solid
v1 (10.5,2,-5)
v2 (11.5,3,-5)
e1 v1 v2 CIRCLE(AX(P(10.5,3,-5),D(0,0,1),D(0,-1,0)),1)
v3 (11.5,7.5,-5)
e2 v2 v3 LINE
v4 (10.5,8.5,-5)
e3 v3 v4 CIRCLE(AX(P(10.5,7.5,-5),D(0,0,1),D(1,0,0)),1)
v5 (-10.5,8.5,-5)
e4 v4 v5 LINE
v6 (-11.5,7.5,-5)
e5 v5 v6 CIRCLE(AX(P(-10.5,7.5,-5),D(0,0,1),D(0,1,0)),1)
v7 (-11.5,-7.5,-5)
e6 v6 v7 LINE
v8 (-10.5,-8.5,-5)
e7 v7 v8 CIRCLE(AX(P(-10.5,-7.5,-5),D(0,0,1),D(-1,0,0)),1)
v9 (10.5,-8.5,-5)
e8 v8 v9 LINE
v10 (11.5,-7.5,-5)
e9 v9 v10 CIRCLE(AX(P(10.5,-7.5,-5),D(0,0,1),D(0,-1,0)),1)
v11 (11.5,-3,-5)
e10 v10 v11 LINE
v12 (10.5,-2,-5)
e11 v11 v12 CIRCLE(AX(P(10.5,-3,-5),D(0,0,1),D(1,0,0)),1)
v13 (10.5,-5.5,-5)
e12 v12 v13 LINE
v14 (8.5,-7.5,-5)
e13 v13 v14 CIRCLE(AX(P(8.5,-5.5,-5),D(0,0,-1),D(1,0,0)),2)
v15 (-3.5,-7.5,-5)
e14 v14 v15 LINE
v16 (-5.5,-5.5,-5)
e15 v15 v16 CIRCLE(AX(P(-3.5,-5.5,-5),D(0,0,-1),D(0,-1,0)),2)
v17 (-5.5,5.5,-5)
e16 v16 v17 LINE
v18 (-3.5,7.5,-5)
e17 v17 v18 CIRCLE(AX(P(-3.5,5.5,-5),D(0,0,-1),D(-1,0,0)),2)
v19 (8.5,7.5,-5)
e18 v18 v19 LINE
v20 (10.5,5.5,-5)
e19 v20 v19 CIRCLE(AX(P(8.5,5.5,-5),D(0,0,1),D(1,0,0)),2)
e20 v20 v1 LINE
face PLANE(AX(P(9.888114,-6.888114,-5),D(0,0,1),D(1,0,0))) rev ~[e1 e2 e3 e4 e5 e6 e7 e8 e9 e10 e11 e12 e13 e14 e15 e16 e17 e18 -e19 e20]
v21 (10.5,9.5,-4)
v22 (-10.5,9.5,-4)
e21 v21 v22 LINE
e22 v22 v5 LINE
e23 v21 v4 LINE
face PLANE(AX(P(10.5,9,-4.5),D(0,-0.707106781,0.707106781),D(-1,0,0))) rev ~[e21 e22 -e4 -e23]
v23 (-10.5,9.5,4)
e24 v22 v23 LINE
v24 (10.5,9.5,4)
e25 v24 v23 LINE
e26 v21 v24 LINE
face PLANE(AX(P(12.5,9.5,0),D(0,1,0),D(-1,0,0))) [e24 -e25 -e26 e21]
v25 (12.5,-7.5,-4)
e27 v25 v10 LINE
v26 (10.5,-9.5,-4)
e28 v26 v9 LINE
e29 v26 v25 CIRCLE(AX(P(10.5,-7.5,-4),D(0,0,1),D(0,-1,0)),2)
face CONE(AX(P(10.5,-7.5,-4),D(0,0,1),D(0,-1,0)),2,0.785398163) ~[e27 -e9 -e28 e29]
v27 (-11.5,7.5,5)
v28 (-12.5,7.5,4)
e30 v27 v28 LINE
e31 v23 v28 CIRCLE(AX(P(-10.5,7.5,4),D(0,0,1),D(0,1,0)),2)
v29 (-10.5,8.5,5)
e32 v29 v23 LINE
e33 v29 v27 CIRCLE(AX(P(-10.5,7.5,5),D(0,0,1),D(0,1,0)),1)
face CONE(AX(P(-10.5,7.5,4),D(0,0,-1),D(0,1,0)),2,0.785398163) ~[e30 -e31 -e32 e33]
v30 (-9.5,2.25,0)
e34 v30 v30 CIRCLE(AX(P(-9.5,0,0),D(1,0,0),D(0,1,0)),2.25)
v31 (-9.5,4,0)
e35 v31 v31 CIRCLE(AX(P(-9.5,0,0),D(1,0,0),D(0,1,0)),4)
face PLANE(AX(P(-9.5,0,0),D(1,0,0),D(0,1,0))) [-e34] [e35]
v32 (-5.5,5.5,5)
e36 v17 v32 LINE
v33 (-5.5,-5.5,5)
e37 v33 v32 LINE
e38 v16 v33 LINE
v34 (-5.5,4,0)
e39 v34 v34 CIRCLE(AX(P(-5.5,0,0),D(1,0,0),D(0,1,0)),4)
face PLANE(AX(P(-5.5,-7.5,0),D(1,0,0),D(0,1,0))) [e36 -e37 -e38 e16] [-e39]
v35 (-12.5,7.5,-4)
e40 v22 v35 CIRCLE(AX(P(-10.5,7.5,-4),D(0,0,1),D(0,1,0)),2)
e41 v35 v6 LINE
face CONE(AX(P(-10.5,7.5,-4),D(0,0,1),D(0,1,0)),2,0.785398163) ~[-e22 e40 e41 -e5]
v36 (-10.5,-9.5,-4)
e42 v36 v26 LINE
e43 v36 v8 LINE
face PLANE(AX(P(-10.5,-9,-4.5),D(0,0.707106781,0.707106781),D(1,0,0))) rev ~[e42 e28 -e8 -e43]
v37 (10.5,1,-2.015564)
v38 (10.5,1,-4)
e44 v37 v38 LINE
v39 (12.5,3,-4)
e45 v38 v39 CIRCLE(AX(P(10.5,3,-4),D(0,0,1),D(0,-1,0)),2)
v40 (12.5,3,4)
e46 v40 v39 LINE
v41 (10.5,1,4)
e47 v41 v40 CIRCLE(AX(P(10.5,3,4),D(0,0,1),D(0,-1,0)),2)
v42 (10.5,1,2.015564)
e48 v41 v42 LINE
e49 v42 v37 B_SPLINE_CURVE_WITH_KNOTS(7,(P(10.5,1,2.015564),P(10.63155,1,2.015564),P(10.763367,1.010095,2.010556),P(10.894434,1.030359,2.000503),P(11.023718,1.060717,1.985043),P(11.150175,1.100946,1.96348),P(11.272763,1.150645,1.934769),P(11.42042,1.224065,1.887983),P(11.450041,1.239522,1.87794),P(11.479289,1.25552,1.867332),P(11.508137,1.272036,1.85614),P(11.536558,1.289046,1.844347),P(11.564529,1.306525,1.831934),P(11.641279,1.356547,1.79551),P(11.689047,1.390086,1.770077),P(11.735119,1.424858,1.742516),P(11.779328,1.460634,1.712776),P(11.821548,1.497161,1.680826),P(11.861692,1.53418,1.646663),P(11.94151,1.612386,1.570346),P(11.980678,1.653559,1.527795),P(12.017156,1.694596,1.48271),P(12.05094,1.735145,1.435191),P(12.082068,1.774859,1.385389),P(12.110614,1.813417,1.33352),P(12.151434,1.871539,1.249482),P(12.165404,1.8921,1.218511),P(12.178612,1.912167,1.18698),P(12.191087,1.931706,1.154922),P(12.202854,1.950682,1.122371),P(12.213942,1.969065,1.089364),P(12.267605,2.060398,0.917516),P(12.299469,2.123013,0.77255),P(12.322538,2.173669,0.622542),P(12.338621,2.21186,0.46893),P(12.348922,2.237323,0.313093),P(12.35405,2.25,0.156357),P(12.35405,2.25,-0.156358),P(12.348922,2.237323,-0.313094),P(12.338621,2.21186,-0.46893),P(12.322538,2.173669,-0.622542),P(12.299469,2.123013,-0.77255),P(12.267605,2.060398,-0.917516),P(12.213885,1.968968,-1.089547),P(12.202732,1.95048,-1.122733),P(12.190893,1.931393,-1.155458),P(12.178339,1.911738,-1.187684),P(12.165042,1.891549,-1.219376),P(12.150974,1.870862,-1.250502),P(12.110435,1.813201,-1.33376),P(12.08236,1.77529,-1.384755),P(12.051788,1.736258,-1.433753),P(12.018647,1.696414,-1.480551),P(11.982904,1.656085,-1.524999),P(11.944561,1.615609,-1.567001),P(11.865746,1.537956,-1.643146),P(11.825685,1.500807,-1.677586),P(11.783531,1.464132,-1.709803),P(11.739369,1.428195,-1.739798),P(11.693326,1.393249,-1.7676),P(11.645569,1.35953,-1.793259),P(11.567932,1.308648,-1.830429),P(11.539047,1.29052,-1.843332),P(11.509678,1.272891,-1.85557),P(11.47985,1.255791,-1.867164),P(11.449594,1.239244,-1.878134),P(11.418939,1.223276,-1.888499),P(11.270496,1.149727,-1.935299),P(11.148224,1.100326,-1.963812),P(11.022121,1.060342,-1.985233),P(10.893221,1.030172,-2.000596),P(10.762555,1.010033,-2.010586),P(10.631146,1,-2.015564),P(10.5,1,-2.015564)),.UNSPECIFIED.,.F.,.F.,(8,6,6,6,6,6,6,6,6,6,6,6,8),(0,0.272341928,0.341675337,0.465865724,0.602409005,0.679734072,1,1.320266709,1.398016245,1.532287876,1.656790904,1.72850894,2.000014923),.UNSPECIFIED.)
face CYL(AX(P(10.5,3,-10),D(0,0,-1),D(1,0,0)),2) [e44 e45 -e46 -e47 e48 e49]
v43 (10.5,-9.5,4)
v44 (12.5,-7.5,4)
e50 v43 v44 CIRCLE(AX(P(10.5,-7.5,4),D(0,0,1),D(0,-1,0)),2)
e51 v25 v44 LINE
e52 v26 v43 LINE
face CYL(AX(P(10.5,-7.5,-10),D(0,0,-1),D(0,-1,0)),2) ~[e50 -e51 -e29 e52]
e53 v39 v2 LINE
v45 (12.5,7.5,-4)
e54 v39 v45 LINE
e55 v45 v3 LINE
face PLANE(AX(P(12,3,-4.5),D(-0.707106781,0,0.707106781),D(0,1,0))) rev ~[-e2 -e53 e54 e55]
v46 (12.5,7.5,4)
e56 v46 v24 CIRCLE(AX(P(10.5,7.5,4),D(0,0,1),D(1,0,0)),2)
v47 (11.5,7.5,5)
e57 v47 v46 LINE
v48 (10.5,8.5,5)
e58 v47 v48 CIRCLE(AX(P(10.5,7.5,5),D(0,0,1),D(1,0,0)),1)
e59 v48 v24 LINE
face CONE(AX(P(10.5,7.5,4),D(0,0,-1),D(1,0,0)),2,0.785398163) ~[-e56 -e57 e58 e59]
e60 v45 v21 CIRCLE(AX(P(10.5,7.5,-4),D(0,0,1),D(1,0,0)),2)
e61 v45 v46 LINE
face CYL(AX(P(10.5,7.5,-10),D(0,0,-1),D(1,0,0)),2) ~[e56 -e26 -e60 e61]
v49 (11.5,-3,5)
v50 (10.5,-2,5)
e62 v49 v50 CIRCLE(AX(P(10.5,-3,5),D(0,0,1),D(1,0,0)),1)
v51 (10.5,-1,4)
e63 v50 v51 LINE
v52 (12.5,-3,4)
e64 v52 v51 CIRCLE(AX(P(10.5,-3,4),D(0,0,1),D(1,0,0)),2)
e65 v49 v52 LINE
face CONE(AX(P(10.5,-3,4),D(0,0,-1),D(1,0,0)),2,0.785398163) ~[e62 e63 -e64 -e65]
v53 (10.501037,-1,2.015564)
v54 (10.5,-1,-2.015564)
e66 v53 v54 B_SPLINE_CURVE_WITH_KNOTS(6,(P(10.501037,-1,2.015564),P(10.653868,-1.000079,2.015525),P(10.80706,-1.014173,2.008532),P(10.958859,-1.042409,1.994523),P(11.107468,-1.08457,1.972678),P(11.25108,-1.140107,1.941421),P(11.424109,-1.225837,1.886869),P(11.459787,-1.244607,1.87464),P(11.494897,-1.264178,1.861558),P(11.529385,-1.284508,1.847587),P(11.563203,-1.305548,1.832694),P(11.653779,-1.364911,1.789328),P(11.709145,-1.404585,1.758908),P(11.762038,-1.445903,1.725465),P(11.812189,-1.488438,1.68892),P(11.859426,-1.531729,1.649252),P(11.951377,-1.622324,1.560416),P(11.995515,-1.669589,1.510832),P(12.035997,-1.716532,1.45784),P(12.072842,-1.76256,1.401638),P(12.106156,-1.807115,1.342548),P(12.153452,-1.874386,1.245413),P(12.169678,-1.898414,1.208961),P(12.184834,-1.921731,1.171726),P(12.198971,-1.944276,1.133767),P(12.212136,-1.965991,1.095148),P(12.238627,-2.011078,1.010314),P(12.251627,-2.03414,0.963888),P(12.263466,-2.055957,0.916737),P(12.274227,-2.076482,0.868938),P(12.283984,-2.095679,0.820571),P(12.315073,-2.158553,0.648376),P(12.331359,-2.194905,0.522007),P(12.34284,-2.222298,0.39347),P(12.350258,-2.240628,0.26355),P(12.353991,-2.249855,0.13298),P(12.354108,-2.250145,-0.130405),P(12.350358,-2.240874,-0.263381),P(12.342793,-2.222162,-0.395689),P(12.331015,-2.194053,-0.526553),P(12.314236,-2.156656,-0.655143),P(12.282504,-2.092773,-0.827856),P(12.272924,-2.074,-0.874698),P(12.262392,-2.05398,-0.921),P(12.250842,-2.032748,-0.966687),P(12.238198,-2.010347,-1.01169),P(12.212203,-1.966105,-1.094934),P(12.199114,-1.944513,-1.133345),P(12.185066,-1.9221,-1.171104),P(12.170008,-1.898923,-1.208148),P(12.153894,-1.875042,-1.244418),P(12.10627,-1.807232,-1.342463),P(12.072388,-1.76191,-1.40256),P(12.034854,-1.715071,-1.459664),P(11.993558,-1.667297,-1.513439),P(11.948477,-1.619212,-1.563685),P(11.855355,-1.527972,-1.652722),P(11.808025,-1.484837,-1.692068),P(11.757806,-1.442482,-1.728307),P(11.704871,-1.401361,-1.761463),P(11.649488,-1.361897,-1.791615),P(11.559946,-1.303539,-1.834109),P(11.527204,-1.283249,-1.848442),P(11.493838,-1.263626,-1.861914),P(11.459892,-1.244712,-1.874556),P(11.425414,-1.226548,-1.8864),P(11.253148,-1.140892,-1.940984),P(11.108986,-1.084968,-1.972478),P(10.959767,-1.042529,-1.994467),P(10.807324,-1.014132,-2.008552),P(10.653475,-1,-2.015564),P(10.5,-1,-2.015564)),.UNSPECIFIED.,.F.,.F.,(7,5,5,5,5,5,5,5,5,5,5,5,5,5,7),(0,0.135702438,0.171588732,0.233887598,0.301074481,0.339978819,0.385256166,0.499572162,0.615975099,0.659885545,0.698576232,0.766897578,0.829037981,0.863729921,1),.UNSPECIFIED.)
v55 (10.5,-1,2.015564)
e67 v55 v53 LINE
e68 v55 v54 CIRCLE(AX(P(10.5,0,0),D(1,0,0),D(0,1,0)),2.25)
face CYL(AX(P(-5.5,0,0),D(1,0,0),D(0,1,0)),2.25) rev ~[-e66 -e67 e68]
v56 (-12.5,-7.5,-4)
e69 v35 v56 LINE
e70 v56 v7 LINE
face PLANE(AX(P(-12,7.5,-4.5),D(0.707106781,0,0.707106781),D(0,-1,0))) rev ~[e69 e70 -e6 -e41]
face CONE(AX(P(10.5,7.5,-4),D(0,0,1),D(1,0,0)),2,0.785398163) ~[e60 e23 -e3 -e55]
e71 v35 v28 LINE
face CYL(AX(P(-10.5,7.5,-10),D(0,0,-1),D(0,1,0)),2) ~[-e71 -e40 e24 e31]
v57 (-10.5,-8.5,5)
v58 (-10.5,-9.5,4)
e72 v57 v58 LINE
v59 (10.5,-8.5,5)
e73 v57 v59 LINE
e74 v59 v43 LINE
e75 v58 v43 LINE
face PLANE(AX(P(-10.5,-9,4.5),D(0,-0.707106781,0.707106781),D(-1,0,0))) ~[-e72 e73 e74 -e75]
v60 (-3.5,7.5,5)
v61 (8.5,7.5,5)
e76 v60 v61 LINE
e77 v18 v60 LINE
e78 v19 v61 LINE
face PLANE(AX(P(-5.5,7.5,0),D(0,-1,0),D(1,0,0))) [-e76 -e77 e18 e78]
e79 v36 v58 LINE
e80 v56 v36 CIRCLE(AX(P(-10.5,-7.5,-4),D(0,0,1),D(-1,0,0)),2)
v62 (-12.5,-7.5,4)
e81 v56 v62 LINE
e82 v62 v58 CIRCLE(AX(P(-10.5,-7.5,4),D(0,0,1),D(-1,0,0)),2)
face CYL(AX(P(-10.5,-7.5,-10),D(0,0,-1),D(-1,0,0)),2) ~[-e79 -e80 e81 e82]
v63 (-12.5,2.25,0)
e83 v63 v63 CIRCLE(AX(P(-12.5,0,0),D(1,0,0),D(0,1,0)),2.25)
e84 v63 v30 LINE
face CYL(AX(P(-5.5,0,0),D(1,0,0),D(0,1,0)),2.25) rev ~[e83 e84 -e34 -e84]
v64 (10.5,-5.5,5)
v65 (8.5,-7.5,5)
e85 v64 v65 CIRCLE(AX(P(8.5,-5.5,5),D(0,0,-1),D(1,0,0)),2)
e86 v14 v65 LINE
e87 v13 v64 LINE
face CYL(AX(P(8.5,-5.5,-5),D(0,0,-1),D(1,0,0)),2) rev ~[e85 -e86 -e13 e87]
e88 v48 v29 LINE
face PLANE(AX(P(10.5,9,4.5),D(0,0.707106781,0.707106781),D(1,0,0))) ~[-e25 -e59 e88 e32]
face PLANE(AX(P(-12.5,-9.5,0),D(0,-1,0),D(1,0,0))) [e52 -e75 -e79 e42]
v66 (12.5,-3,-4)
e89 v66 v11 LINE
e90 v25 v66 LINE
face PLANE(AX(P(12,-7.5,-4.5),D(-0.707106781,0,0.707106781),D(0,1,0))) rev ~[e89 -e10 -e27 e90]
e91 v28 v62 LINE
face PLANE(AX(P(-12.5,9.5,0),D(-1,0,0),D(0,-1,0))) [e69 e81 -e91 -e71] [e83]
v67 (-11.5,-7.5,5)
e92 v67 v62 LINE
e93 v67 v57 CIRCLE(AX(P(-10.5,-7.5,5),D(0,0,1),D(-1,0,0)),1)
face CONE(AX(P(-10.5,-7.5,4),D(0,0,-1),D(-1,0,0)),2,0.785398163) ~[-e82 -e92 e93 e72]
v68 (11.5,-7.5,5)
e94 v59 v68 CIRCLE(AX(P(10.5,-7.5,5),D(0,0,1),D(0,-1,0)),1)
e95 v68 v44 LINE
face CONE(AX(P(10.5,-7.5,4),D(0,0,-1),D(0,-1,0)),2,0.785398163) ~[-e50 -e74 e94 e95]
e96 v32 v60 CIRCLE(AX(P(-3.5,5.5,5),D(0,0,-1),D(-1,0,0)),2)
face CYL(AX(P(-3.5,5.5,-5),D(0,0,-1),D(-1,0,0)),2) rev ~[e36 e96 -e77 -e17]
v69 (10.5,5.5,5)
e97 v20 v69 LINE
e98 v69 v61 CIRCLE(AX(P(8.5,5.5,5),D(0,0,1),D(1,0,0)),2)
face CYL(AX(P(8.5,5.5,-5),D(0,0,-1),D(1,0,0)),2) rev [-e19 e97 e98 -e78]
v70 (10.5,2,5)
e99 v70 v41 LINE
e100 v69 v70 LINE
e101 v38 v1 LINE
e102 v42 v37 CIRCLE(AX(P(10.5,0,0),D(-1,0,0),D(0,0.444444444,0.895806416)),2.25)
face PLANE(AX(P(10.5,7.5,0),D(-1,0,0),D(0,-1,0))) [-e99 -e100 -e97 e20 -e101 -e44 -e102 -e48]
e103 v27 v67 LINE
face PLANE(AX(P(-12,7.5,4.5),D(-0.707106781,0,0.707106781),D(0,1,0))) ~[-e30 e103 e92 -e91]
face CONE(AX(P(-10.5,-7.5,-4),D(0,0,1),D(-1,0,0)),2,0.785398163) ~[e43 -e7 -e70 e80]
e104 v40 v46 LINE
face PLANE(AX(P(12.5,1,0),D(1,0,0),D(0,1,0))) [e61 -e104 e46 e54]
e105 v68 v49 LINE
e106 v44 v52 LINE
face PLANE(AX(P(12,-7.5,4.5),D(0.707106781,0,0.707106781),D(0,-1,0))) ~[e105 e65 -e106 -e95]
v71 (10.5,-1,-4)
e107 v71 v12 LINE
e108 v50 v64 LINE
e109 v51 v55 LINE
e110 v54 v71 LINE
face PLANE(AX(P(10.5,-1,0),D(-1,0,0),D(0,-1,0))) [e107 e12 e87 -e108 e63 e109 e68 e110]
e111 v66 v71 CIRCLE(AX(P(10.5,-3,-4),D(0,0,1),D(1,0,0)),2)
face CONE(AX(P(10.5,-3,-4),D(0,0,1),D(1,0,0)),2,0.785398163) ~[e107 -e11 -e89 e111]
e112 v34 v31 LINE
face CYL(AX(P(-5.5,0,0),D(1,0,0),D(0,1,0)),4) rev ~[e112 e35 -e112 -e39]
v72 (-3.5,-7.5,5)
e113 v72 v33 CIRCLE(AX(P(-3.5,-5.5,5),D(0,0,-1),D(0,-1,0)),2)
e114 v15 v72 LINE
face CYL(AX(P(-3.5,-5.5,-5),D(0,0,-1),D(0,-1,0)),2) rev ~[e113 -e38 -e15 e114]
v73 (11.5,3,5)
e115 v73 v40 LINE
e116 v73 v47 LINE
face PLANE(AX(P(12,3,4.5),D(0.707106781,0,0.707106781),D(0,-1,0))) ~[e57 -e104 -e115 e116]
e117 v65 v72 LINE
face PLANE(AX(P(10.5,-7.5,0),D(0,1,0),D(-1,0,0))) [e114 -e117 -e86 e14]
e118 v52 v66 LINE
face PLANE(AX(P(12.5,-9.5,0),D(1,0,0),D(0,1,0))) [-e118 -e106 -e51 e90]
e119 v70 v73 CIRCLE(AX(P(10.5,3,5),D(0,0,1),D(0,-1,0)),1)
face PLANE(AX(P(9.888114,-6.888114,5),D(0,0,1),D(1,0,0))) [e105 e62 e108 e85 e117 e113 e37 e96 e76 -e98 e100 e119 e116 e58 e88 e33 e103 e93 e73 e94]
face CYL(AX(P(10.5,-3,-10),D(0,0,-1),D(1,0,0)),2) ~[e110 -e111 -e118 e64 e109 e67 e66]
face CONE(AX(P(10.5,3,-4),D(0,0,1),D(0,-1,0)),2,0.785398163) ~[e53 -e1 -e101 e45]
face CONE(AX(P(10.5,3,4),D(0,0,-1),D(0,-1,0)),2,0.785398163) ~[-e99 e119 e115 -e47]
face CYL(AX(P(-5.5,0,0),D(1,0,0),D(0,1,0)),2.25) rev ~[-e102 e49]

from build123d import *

# Parameters (mm, degrees)
F1_DEPTH    = 5
F2_R        = 2.25
F3_DEPTH    = 100
F4_R        = 4
F5_DEPTH    = 4
F6_T1_DEPTH = 10
F6_T3_DEPTH = 20
F6_T5_DEPTH = 12.9844355629
F6_T7_DEPTH = 12.9844355629
F7_SIZE     = 1


# Not quite as in the source:
# - a fillet or chamfer that OpenCascade refuses, or shapes differently, is made with other operations: its cross-section is extruded or revolved along the edge and cut away or added


with BuildPart() as f1:
    # F0 (on Top) → F1 (new body, symmetric)
    with BuildSketch(Plane.XY):
        Polygon((12.5, 1), (12.5, 9.5), (-12.5, 9.5), (-12.5, -9.5), (12.5, -9.5), (12.5, -1), (10.5, -1), (10.5, -7.5), (-5.5, -7.5), (-5.5, 7.5), (10.5, 7.5), (10.5, 1), align=None)
    extrude(amount=F1_DEPTH, both=True)

    # F2 (on face) → F3 (cut, symmetric)
    with BuildSketch(Plane.YZ.offset(-5.5)):
        Circle(F2_R)
    extrude(amount=F3_DEPTH, both=True, mode=Mode.SUBTRACT)

    # F4 (on face) → F5 (cut)
    with BuildSketch(Plane.YZ.offset(-5.5)):
        Circle(F4_R)
    extrude(amount=-F5_DEPTH, mode=Mode.SUBTRACT)

    # F6: fillet of radius 2 on 12 edges, made by hand

    # F6_s2 → F6_t1 (join)
    with BuildSketch(Plane.XY.offset(-5)):
        with BuildLine():
            ThreePointArc((10.5, -5.5), (9.9142135624, -6.9142135624), (8.5, -7.5))
            Line((8.5, -7.5), (10.5, -7.5))
            Line((10.5, -7.5), (10.5, -5.5))
        make_face()
        with BuildLine():
            ThreePointArc((10.5, 5.5), (9.9142135624, 6.9142135624), (8.5, 7.5))
            Line((8.5, 7.5), (10.5, 7.5))
            Line((10.5, 7.5), (10.5, 5.5))
        make_face()
        with BuildLine():
            ThreePointArc((-5.5, 5.5), (-4.9142135624, 6.9142135624), (-3.5, 7.5))
            Line((-3.5, 7.5), (-5.5, 7.5))
            Line((-5.5, 7.5), (-5.5, 5.5))
        make_face()
        with BuildLine():
            ThreePointArc((-3.5, -7.5), (-4.9142135624, -6.9142135624), (-5.5, -5.5))
            Line((-5.5, -5.5), (-5.5, -7.5))
            Line((-5.5, -7.5), (-3.5, -7.5))
        make_face()
    extrude(amount=F6_T1_DEPTH)

    # F6_s4 → F6_t3 (cut)
    with BuildSketch(Plane.XY.offset(-10)):
        with BuildLine():
            ThreePointArc((-10.5, 9.5), (-11.9142135624, 8.9142135624), (-12.5, 7.5))
            Line((-12.5, 7.5), (-12.5, 9.5))
            Line((-12.5, 9.5), (-10.5, 9.5))
        make_face()
        with BuildLine():
            ThreePointArc((-12.5, -7.5), (-11.9142135624, -8.9142135624), (-10.5, -9.5))
            Line((-10.5, -9.5), (-12.5, -9.5))
            Line((-12.5, -9.5), (-12.5, -7.5))
        make_face()
        with BuildLine():
            ThreePointArc((12.5, 7.5), (11.9142135624, 8.9142135624), (10.5, 9.5))
            Line((10.5, 9.5), (12.5, 9.5))
            Line((12.5, 9.5), (12.5, 7.5))
        make_face()
        with BuildLine():
            ThreePointArc((10.5, -9.5), (11.9142135624, -8.9142135624), (12.5, -7.5))
            Line((12.5, -7.5), (12.5, -9.5))
            Line((12.5, -9.5), (10.5, -9.5))
        make_face()
    extrude(amount=F6_T3_DEPTH, mode=Mode.SUBTRACT)

    # F6_s6 → F6_t5 (cut)
    with BuildSketch(Plane.XY.offset(-2.9844355629)):
        with BuildLine():
            ThreePointArc((12.5, -3), (11.9142135624, -1.5857864376), (10.5, -1))
            Line((10.5, -1), (12.5, -1))
            Line((12.5, -1), (12.5, -3))
        make_face()
        with BuildLine():
            ThreePointArc((12.5, 3), (11.9142135624, 1.5857864376), (10.5, 1))
            Line((10.5, 1), (12.5, 1))
            Line((12.5, 1), (12.5, 3))
        make_face()
    extrude(amount=F6_T5_DEPTH, mode=Mode.SUBTRACT)

    # F6_s8 → F6_t7 (cut)
    with BuildSketch(Plane.XY.offset(-10)):
        with BuildLine():
            ThreePointArc((12.5, -3), (11.9142135624, -1.5857864376), (10.5, -1))
            Line((10.5, -1), (12.5, -1))
            Line((12.5, -1), (12.5, -3))
        make_face()
        with BuildLine():
            ThreePointArc((12.5, 3), (11.9142135624, 1.5857864376), (10.5, 1))
            Line((10.5, 1), (12.5, 1))
            Line((12.5, 1), (12.5, 3))
        make_face()
    extrude(amount=F6_T7_DEPTH, mode=Mode.SUBTRACT)

    # F7
    f7_edges = [f1.edges().sort_by_distance(p)[0] for p in [
        (0, 9.5, 5),
        (-12.5, 0, -5),
    ]]
    chamfer(f7_edges, length=F7_SIZE)


solid = f1.part
